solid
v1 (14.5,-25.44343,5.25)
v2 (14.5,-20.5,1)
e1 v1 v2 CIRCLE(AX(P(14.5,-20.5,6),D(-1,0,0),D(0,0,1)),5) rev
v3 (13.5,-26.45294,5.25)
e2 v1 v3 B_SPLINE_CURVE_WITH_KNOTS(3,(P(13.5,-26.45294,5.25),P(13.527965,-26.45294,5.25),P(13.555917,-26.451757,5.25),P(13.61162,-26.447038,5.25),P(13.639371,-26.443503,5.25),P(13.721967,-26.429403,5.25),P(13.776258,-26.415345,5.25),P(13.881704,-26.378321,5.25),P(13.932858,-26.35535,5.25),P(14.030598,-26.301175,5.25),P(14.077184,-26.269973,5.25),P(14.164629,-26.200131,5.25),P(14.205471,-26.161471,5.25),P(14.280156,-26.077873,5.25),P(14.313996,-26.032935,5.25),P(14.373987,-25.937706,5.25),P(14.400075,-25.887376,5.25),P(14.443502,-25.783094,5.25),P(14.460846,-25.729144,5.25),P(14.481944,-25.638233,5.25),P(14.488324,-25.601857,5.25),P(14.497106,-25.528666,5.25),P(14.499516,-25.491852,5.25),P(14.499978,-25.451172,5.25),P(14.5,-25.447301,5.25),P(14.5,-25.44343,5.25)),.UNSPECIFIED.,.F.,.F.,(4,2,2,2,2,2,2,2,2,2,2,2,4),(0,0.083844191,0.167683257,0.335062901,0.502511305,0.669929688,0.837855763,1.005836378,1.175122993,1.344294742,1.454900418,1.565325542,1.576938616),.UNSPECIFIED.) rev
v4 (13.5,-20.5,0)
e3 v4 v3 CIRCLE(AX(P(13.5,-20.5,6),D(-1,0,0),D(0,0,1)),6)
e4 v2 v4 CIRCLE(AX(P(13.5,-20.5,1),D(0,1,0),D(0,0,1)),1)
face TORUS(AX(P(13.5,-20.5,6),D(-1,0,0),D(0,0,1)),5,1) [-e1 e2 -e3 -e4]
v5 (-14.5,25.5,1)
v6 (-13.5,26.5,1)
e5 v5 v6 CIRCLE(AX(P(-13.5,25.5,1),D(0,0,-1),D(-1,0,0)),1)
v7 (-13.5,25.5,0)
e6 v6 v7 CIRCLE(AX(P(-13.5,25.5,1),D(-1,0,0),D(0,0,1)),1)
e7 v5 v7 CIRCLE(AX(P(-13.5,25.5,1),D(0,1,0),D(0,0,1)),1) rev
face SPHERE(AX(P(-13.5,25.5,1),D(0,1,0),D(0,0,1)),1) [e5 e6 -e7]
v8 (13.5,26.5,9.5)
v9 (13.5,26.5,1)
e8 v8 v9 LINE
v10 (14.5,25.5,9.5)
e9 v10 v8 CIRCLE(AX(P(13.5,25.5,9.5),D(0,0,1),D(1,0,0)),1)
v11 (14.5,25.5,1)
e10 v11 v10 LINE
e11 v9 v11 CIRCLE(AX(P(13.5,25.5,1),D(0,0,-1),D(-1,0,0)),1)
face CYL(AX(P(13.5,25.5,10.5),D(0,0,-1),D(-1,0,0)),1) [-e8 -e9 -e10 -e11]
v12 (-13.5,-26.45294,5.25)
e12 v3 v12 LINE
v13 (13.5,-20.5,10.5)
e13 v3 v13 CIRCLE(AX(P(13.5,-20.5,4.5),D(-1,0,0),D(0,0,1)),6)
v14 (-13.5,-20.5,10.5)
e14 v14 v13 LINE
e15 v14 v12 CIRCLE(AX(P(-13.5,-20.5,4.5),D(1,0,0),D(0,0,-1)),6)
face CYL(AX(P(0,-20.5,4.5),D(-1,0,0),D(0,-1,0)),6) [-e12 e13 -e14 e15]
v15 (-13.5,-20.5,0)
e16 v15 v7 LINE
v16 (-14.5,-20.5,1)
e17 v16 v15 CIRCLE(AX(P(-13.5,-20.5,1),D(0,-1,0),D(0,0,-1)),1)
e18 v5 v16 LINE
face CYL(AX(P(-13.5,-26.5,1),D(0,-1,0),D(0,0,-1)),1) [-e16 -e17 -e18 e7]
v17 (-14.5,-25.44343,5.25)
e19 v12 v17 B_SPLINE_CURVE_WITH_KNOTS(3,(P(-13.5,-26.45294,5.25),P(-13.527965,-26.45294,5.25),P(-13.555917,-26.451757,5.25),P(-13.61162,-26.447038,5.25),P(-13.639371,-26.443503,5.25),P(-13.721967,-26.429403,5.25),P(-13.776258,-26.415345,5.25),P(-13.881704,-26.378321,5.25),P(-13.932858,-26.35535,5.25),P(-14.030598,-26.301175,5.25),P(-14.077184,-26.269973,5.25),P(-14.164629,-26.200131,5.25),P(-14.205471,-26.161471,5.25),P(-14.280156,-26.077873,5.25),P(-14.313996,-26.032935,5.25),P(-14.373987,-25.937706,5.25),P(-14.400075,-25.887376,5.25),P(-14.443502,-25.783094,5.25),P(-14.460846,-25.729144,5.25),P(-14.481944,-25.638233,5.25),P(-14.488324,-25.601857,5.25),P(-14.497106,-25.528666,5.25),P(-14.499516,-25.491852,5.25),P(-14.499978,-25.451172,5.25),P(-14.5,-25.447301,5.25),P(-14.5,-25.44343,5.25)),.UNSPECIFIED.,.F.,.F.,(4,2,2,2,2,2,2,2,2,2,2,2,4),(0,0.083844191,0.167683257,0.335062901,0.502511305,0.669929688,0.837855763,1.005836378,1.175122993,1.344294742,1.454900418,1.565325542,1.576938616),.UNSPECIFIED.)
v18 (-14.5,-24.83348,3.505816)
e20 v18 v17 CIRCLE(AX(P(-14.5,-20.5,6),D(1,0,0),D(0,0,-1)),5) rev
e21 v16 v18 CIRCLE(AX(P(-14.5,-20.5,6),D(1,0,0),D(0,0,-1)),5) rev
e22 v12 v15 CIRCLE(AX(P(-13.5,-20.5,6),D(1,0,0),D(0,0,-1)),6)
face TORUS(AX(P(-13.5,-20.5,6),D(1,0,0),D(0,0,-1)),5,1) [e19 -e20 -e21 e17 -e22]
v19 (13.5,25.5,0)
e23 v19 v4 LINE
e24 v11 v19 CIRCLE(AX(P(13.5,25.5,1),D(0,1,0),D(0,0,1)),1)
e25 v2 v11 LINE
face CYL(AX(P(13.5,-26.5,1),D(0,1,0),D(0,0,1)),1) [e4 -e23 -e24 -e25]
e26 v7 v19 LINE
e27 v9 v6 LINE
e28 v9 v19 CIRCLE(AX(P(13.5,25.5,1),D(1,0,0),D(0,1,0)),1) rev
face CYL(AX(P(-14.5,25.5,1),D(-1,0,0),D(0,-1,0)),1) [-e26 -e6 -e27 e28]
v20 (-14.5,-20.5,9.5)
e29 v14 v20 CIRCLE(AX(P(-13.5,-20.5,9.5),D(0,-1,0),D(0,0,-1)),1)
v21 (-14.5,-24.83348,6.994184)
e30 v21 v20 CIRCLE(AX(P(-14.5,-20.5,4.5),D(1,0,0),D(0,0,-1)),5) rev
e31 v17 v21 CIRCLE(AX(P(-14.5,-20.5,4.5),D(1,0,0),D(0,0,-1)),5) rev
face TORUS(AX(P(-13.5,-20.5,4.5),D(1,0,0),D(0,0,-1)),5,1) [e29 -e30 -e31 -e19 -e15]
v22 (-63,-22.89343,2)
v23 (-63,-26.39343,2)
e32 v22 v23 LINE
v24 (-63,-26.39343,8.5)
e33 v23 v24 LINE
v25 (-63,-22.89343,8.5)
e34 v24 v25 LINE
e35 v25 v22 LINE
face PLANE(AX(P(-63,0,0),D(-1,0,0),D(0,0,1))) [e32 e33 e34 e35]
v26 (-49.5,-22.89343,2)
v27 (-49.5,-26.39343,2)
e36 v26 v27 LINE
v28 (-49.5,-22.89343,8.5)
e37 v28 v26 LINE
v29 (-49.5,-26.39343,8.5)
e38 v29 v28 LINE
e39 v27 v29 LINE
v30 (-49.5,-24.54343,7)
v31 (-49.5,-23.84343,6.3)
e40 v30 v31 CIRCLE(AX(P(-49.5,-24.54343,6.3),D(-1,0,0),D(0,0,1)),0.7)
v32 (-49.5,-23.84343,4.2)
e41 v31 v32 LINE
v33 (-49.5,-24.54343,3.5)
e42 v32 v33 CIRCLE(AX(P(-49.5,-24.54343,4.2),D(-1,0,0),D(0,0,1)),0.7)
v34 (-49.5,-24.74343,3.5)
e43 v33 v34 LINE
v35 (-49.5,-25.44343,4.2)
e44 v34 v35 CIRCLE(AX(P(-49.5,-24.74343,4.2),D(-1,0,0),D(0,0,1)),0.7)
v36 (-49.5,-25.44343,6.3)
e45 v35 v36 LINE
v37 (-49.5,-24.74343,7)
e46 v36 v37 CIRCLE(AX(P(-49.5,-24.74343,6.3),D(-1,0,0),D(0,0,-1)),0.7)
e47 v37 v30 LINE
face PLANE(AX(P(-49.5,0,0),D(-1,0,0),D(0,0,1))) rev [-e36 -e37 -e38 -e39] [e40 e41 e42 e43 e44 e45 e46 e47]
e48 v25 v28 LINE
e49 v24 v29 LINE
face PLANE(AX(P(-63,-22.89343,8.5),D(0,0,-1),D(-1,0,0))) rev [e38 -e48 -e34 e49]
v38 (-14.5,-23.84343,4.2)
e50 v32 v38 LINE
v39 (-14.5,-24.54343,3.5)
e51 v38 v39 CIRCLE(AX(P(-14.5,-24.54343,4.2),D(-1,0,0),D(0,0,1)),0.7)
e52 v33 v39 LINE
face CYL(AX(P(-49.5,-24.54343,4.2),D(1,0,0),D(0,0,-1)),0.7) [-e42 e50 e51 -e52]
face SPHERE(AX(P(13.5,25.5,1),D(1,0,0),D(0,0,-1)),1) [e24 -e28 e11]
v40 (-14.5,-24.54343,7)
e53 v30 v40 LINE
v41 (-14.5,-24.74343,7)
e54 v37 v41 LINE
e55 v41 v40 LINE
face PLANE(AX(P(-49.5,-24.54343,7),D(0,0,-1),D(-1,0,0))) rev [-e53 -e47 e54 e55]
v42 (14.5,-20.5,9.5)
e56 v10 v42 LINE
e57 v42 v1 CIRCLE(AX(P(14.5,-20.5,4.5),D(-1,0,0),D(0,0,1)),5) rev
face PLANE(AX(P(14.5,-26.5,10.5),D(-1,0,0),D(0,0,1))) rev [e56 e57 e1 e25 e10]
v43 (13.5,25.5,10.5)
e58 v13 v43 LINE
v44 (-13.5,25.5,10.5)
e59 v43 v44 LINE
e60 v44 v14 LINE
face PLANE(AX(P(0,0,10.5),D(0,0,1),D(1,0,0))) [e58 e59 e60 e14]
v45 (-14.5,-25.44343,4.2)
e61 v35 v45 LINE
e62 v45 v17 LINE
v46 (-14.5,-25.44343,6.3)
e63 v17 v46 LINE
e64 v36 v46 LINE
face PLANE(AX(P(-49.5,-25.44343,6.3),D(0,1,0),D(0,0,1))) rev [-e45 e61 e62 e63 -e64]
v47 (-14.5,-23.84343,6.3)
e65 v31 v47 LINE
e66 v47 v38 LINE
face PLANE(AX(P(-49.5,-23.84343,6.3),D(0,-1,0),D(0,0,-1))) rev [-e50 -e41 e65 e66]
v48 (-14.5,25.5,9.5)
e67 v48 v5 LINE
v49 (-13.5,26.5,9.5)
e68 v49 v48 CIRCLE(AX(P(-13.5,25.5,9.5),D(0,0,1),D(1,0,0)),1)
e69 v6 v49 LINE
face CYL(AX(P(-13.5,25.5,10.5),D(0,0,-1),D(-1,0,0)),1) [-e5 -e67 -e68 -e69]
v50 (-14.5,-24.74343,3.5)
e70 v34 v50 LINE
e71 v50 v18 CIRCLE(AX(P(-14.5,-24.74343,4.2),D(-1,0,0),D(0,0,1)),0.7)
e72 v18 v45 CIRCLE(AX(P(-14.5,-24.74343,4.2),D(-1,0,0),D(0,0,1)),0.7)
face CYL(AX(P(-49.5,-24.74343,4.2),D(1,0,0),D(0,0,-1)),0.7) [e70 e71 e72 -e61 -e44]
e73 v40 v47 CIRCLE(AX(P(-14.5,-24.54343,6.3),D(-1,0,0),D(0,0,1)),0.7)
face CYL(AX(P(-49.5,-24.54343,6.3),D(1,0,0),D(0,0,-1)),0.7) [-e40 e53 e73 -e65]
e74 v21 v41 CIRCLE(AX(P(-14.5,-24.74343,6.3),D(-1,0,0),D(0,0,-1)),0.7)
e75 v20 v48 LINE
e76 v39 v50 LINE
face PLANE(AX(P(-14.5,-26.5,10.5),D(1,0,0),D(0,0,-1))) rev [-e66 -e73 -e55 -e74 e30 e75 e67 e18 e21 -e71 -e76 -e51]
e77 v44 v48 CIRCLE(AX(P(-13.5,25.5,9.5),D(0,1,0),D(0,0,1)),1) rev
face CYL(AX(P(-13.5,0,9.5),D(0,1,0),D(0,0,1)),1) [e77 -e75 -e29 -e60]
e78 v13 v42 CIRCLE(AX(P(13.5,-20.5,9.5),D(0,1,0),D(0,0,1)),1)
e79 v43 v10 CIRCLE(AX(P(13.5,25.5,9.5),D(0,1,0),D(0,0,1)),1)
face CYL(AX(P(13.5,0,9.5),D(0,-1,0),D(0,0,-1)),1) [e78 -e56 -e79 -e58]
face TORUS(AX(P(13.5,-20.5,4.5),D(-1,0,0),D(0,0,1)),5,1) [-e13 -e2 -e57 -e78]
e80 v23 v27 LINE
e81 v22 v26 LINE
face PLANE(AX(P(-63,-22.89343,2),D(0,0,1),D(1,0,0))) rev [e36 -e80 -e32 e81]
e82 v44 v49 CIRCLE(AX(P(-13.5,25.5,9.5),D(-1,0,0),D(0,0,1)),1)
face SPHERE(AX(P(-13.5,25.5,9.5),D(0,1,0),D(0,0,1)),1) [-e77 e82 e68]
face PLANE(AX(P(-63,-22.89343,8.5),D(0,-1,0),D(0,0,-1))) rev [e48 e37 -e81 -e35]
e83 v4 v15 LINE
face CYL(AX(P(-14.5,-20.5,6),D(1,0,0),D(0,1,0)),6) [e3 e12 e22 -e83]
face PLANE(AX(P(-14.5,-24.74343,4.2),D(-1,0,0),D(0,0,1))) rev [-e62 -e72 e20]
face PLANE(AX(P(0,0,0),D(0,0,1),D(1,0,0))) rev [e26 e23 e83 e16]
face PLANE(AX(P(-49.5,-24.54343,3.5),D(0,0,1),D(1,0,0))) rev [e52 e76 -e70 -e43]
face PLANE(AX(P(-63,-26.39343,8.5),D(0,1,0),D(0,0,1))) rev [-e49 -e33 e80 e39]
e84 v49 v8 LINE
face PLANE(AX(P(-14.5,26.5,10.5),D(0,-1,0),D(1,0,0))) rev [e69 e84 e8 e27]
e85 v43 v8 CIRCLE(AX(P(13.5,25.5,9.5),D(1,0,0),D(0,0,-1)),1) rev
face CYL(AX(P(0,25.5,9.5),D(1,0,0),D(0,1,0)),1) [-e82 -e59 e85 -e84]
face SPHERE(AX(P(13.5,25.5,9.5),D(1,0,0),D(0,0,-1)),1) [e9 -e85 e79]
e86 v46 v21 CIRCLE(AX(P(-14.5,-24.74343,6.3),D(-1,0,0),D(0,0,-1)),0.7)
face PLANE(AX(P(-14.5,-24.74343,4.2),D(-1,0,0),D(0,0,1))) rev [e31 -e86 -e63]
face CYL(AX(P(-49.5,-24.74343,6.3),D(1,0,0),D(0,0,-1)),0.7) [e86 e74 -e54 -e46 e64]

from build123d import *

# Parameters (mm, degrees)
CROQUIS1_W              = 53
CROQUIS1_H              = 29
SALIENTE_EXTRUIR1_DEPTH = 10.5
REDONDEO1_R             = 6
REDONDEO2_R             = 1
SALIENTE_EXTRUIR2_DEPTH = 35
CROQUIS3_W              = 3.5
CROQUIS3_H              = 6.5
SALIENTE_EXTRUIR3_DEPTH = 13.5


with BuildPart() as part:
    # Croquis1 → Saliente-Extruir1 (new body)
    with BuildSketch(Plane(origin=(0, 0, 0), x_dir=(0, 1, 0), z_dir=(0, 0, 1))):
        Rectangle(CROQUIS1_W, CROQUIS1_H)
    extrude(amount=SALIENTE_EXTRUIR1_DEPTH)

    # Redondeo1
    # the kernel refuses this fillet: 6 mm, written as the material it takes off along each edge
    with BuildSketch(Plane(origin=(29.5, -26.5, 0), x_dir=(0, 0, 1), z_dir=(-1, 0, 0))) as redondeo1_piece_1:
        with BuildLine():
            CenterArc((REDONDEO1_R, REDONDEO1_R), REDONDEO1_R, 180, 90)
            Line((0, REDONDEO1_R), (0, 0))
            Line((0, 0), (REDONDEO1_R, 0))
        make_face()
    extrude(amount=59, mode=Mode.SUBTRACT)
    with BuildSketch(Plane(origin=(29.5, -26.5, 10.5), x_dir=(0, 0, -1), z_dir=(-1, 0, 0))) as redondeo1_piece_2:
        with BuildLine():
            CenterArc((REDONDEO1_R, -REDONDEO1_R), REDONDEO1_R, 90, 90)
            Line((0, -REDONDEO1_R), (0, 0))
            Line((0, 0), (REDONDEO1_R, 0))
        make_face()
    extrude(amount=59, mode=Mode.SUBTRACT)

    # Redondeo2
    redondeo2_edges = [part.edges().sort_by_distance(p)[0] for p in [
        (14.5, 3, 0),
        (14.5, 3, 10.5),
        (14.5, -24.468626967, 9),
        (14.5, -24.468626967, 1.5),
        (-14.5, -24.468626967, 9),
        (-14.5, -24.468626967, 1.5),
        (0, 26.5, 10.5),
        (-14.5, 3, 0),
        (0, 26.5, 0),
        (14.5, 26.5, 5.25),
        (-14.5, 26.5, 5.25),
        (-14.5, 3, 10.5),
    ]]
    fillet(redondeo2_edges, radius=REDONDEO2_R)

    # Croquis2 → Saliente-Extruir2 (add)
    with BuildSketch(Plane(origin=(-14.5, 0, 0), x_dir=(0, -1, 0), z_dir=(-1, 0, 0))):
        with BuildLine():
            Line((24.543429983, 7), (24.743429983, 7))
            ThreePointArc((24.743429983, 7), (25.23840473, 6.794974747), (25.443429983, 6.3))
            Line((25.443429983, 6.3), (25.443429983, 4.2))
            ThreePointArc((25.443429983, 4.2), (25.23840473, 3.705025253), (24.743429983, 3.5))
            Line((24.743429983, 3.5), (24.543429983, 3.5))
            ThreePointArc((24.543429983, 3.5), (24.048455236, 3.705025253), (23.843429983, 4.2))
            Line((23.843429983, 4.2), (23.843429983, 6.3))
            ThreePointArc((23.843429983, 6.3), (24.048455236, 6.794974747), (24.543429983, 7))
        make_face()
    extrude(amount=SALIENTE_EXTRUIR2_DEPTH)

    # Croquis3 → Saliente-Extruir3 (add)
    with BuildSketch(Plane(origin=(-49.5, 0, 0), x_dir=(0, -1, 0), z_dir=(-1, 0, 0))):
        with Locations((24.643429983, 5.25)):
            Rectangle(CROQUIS3_W, CROQUIS3_H)
    extrude(amount=SALIENTE_EXTRUIR3_DEPTH)


solid = part.part
